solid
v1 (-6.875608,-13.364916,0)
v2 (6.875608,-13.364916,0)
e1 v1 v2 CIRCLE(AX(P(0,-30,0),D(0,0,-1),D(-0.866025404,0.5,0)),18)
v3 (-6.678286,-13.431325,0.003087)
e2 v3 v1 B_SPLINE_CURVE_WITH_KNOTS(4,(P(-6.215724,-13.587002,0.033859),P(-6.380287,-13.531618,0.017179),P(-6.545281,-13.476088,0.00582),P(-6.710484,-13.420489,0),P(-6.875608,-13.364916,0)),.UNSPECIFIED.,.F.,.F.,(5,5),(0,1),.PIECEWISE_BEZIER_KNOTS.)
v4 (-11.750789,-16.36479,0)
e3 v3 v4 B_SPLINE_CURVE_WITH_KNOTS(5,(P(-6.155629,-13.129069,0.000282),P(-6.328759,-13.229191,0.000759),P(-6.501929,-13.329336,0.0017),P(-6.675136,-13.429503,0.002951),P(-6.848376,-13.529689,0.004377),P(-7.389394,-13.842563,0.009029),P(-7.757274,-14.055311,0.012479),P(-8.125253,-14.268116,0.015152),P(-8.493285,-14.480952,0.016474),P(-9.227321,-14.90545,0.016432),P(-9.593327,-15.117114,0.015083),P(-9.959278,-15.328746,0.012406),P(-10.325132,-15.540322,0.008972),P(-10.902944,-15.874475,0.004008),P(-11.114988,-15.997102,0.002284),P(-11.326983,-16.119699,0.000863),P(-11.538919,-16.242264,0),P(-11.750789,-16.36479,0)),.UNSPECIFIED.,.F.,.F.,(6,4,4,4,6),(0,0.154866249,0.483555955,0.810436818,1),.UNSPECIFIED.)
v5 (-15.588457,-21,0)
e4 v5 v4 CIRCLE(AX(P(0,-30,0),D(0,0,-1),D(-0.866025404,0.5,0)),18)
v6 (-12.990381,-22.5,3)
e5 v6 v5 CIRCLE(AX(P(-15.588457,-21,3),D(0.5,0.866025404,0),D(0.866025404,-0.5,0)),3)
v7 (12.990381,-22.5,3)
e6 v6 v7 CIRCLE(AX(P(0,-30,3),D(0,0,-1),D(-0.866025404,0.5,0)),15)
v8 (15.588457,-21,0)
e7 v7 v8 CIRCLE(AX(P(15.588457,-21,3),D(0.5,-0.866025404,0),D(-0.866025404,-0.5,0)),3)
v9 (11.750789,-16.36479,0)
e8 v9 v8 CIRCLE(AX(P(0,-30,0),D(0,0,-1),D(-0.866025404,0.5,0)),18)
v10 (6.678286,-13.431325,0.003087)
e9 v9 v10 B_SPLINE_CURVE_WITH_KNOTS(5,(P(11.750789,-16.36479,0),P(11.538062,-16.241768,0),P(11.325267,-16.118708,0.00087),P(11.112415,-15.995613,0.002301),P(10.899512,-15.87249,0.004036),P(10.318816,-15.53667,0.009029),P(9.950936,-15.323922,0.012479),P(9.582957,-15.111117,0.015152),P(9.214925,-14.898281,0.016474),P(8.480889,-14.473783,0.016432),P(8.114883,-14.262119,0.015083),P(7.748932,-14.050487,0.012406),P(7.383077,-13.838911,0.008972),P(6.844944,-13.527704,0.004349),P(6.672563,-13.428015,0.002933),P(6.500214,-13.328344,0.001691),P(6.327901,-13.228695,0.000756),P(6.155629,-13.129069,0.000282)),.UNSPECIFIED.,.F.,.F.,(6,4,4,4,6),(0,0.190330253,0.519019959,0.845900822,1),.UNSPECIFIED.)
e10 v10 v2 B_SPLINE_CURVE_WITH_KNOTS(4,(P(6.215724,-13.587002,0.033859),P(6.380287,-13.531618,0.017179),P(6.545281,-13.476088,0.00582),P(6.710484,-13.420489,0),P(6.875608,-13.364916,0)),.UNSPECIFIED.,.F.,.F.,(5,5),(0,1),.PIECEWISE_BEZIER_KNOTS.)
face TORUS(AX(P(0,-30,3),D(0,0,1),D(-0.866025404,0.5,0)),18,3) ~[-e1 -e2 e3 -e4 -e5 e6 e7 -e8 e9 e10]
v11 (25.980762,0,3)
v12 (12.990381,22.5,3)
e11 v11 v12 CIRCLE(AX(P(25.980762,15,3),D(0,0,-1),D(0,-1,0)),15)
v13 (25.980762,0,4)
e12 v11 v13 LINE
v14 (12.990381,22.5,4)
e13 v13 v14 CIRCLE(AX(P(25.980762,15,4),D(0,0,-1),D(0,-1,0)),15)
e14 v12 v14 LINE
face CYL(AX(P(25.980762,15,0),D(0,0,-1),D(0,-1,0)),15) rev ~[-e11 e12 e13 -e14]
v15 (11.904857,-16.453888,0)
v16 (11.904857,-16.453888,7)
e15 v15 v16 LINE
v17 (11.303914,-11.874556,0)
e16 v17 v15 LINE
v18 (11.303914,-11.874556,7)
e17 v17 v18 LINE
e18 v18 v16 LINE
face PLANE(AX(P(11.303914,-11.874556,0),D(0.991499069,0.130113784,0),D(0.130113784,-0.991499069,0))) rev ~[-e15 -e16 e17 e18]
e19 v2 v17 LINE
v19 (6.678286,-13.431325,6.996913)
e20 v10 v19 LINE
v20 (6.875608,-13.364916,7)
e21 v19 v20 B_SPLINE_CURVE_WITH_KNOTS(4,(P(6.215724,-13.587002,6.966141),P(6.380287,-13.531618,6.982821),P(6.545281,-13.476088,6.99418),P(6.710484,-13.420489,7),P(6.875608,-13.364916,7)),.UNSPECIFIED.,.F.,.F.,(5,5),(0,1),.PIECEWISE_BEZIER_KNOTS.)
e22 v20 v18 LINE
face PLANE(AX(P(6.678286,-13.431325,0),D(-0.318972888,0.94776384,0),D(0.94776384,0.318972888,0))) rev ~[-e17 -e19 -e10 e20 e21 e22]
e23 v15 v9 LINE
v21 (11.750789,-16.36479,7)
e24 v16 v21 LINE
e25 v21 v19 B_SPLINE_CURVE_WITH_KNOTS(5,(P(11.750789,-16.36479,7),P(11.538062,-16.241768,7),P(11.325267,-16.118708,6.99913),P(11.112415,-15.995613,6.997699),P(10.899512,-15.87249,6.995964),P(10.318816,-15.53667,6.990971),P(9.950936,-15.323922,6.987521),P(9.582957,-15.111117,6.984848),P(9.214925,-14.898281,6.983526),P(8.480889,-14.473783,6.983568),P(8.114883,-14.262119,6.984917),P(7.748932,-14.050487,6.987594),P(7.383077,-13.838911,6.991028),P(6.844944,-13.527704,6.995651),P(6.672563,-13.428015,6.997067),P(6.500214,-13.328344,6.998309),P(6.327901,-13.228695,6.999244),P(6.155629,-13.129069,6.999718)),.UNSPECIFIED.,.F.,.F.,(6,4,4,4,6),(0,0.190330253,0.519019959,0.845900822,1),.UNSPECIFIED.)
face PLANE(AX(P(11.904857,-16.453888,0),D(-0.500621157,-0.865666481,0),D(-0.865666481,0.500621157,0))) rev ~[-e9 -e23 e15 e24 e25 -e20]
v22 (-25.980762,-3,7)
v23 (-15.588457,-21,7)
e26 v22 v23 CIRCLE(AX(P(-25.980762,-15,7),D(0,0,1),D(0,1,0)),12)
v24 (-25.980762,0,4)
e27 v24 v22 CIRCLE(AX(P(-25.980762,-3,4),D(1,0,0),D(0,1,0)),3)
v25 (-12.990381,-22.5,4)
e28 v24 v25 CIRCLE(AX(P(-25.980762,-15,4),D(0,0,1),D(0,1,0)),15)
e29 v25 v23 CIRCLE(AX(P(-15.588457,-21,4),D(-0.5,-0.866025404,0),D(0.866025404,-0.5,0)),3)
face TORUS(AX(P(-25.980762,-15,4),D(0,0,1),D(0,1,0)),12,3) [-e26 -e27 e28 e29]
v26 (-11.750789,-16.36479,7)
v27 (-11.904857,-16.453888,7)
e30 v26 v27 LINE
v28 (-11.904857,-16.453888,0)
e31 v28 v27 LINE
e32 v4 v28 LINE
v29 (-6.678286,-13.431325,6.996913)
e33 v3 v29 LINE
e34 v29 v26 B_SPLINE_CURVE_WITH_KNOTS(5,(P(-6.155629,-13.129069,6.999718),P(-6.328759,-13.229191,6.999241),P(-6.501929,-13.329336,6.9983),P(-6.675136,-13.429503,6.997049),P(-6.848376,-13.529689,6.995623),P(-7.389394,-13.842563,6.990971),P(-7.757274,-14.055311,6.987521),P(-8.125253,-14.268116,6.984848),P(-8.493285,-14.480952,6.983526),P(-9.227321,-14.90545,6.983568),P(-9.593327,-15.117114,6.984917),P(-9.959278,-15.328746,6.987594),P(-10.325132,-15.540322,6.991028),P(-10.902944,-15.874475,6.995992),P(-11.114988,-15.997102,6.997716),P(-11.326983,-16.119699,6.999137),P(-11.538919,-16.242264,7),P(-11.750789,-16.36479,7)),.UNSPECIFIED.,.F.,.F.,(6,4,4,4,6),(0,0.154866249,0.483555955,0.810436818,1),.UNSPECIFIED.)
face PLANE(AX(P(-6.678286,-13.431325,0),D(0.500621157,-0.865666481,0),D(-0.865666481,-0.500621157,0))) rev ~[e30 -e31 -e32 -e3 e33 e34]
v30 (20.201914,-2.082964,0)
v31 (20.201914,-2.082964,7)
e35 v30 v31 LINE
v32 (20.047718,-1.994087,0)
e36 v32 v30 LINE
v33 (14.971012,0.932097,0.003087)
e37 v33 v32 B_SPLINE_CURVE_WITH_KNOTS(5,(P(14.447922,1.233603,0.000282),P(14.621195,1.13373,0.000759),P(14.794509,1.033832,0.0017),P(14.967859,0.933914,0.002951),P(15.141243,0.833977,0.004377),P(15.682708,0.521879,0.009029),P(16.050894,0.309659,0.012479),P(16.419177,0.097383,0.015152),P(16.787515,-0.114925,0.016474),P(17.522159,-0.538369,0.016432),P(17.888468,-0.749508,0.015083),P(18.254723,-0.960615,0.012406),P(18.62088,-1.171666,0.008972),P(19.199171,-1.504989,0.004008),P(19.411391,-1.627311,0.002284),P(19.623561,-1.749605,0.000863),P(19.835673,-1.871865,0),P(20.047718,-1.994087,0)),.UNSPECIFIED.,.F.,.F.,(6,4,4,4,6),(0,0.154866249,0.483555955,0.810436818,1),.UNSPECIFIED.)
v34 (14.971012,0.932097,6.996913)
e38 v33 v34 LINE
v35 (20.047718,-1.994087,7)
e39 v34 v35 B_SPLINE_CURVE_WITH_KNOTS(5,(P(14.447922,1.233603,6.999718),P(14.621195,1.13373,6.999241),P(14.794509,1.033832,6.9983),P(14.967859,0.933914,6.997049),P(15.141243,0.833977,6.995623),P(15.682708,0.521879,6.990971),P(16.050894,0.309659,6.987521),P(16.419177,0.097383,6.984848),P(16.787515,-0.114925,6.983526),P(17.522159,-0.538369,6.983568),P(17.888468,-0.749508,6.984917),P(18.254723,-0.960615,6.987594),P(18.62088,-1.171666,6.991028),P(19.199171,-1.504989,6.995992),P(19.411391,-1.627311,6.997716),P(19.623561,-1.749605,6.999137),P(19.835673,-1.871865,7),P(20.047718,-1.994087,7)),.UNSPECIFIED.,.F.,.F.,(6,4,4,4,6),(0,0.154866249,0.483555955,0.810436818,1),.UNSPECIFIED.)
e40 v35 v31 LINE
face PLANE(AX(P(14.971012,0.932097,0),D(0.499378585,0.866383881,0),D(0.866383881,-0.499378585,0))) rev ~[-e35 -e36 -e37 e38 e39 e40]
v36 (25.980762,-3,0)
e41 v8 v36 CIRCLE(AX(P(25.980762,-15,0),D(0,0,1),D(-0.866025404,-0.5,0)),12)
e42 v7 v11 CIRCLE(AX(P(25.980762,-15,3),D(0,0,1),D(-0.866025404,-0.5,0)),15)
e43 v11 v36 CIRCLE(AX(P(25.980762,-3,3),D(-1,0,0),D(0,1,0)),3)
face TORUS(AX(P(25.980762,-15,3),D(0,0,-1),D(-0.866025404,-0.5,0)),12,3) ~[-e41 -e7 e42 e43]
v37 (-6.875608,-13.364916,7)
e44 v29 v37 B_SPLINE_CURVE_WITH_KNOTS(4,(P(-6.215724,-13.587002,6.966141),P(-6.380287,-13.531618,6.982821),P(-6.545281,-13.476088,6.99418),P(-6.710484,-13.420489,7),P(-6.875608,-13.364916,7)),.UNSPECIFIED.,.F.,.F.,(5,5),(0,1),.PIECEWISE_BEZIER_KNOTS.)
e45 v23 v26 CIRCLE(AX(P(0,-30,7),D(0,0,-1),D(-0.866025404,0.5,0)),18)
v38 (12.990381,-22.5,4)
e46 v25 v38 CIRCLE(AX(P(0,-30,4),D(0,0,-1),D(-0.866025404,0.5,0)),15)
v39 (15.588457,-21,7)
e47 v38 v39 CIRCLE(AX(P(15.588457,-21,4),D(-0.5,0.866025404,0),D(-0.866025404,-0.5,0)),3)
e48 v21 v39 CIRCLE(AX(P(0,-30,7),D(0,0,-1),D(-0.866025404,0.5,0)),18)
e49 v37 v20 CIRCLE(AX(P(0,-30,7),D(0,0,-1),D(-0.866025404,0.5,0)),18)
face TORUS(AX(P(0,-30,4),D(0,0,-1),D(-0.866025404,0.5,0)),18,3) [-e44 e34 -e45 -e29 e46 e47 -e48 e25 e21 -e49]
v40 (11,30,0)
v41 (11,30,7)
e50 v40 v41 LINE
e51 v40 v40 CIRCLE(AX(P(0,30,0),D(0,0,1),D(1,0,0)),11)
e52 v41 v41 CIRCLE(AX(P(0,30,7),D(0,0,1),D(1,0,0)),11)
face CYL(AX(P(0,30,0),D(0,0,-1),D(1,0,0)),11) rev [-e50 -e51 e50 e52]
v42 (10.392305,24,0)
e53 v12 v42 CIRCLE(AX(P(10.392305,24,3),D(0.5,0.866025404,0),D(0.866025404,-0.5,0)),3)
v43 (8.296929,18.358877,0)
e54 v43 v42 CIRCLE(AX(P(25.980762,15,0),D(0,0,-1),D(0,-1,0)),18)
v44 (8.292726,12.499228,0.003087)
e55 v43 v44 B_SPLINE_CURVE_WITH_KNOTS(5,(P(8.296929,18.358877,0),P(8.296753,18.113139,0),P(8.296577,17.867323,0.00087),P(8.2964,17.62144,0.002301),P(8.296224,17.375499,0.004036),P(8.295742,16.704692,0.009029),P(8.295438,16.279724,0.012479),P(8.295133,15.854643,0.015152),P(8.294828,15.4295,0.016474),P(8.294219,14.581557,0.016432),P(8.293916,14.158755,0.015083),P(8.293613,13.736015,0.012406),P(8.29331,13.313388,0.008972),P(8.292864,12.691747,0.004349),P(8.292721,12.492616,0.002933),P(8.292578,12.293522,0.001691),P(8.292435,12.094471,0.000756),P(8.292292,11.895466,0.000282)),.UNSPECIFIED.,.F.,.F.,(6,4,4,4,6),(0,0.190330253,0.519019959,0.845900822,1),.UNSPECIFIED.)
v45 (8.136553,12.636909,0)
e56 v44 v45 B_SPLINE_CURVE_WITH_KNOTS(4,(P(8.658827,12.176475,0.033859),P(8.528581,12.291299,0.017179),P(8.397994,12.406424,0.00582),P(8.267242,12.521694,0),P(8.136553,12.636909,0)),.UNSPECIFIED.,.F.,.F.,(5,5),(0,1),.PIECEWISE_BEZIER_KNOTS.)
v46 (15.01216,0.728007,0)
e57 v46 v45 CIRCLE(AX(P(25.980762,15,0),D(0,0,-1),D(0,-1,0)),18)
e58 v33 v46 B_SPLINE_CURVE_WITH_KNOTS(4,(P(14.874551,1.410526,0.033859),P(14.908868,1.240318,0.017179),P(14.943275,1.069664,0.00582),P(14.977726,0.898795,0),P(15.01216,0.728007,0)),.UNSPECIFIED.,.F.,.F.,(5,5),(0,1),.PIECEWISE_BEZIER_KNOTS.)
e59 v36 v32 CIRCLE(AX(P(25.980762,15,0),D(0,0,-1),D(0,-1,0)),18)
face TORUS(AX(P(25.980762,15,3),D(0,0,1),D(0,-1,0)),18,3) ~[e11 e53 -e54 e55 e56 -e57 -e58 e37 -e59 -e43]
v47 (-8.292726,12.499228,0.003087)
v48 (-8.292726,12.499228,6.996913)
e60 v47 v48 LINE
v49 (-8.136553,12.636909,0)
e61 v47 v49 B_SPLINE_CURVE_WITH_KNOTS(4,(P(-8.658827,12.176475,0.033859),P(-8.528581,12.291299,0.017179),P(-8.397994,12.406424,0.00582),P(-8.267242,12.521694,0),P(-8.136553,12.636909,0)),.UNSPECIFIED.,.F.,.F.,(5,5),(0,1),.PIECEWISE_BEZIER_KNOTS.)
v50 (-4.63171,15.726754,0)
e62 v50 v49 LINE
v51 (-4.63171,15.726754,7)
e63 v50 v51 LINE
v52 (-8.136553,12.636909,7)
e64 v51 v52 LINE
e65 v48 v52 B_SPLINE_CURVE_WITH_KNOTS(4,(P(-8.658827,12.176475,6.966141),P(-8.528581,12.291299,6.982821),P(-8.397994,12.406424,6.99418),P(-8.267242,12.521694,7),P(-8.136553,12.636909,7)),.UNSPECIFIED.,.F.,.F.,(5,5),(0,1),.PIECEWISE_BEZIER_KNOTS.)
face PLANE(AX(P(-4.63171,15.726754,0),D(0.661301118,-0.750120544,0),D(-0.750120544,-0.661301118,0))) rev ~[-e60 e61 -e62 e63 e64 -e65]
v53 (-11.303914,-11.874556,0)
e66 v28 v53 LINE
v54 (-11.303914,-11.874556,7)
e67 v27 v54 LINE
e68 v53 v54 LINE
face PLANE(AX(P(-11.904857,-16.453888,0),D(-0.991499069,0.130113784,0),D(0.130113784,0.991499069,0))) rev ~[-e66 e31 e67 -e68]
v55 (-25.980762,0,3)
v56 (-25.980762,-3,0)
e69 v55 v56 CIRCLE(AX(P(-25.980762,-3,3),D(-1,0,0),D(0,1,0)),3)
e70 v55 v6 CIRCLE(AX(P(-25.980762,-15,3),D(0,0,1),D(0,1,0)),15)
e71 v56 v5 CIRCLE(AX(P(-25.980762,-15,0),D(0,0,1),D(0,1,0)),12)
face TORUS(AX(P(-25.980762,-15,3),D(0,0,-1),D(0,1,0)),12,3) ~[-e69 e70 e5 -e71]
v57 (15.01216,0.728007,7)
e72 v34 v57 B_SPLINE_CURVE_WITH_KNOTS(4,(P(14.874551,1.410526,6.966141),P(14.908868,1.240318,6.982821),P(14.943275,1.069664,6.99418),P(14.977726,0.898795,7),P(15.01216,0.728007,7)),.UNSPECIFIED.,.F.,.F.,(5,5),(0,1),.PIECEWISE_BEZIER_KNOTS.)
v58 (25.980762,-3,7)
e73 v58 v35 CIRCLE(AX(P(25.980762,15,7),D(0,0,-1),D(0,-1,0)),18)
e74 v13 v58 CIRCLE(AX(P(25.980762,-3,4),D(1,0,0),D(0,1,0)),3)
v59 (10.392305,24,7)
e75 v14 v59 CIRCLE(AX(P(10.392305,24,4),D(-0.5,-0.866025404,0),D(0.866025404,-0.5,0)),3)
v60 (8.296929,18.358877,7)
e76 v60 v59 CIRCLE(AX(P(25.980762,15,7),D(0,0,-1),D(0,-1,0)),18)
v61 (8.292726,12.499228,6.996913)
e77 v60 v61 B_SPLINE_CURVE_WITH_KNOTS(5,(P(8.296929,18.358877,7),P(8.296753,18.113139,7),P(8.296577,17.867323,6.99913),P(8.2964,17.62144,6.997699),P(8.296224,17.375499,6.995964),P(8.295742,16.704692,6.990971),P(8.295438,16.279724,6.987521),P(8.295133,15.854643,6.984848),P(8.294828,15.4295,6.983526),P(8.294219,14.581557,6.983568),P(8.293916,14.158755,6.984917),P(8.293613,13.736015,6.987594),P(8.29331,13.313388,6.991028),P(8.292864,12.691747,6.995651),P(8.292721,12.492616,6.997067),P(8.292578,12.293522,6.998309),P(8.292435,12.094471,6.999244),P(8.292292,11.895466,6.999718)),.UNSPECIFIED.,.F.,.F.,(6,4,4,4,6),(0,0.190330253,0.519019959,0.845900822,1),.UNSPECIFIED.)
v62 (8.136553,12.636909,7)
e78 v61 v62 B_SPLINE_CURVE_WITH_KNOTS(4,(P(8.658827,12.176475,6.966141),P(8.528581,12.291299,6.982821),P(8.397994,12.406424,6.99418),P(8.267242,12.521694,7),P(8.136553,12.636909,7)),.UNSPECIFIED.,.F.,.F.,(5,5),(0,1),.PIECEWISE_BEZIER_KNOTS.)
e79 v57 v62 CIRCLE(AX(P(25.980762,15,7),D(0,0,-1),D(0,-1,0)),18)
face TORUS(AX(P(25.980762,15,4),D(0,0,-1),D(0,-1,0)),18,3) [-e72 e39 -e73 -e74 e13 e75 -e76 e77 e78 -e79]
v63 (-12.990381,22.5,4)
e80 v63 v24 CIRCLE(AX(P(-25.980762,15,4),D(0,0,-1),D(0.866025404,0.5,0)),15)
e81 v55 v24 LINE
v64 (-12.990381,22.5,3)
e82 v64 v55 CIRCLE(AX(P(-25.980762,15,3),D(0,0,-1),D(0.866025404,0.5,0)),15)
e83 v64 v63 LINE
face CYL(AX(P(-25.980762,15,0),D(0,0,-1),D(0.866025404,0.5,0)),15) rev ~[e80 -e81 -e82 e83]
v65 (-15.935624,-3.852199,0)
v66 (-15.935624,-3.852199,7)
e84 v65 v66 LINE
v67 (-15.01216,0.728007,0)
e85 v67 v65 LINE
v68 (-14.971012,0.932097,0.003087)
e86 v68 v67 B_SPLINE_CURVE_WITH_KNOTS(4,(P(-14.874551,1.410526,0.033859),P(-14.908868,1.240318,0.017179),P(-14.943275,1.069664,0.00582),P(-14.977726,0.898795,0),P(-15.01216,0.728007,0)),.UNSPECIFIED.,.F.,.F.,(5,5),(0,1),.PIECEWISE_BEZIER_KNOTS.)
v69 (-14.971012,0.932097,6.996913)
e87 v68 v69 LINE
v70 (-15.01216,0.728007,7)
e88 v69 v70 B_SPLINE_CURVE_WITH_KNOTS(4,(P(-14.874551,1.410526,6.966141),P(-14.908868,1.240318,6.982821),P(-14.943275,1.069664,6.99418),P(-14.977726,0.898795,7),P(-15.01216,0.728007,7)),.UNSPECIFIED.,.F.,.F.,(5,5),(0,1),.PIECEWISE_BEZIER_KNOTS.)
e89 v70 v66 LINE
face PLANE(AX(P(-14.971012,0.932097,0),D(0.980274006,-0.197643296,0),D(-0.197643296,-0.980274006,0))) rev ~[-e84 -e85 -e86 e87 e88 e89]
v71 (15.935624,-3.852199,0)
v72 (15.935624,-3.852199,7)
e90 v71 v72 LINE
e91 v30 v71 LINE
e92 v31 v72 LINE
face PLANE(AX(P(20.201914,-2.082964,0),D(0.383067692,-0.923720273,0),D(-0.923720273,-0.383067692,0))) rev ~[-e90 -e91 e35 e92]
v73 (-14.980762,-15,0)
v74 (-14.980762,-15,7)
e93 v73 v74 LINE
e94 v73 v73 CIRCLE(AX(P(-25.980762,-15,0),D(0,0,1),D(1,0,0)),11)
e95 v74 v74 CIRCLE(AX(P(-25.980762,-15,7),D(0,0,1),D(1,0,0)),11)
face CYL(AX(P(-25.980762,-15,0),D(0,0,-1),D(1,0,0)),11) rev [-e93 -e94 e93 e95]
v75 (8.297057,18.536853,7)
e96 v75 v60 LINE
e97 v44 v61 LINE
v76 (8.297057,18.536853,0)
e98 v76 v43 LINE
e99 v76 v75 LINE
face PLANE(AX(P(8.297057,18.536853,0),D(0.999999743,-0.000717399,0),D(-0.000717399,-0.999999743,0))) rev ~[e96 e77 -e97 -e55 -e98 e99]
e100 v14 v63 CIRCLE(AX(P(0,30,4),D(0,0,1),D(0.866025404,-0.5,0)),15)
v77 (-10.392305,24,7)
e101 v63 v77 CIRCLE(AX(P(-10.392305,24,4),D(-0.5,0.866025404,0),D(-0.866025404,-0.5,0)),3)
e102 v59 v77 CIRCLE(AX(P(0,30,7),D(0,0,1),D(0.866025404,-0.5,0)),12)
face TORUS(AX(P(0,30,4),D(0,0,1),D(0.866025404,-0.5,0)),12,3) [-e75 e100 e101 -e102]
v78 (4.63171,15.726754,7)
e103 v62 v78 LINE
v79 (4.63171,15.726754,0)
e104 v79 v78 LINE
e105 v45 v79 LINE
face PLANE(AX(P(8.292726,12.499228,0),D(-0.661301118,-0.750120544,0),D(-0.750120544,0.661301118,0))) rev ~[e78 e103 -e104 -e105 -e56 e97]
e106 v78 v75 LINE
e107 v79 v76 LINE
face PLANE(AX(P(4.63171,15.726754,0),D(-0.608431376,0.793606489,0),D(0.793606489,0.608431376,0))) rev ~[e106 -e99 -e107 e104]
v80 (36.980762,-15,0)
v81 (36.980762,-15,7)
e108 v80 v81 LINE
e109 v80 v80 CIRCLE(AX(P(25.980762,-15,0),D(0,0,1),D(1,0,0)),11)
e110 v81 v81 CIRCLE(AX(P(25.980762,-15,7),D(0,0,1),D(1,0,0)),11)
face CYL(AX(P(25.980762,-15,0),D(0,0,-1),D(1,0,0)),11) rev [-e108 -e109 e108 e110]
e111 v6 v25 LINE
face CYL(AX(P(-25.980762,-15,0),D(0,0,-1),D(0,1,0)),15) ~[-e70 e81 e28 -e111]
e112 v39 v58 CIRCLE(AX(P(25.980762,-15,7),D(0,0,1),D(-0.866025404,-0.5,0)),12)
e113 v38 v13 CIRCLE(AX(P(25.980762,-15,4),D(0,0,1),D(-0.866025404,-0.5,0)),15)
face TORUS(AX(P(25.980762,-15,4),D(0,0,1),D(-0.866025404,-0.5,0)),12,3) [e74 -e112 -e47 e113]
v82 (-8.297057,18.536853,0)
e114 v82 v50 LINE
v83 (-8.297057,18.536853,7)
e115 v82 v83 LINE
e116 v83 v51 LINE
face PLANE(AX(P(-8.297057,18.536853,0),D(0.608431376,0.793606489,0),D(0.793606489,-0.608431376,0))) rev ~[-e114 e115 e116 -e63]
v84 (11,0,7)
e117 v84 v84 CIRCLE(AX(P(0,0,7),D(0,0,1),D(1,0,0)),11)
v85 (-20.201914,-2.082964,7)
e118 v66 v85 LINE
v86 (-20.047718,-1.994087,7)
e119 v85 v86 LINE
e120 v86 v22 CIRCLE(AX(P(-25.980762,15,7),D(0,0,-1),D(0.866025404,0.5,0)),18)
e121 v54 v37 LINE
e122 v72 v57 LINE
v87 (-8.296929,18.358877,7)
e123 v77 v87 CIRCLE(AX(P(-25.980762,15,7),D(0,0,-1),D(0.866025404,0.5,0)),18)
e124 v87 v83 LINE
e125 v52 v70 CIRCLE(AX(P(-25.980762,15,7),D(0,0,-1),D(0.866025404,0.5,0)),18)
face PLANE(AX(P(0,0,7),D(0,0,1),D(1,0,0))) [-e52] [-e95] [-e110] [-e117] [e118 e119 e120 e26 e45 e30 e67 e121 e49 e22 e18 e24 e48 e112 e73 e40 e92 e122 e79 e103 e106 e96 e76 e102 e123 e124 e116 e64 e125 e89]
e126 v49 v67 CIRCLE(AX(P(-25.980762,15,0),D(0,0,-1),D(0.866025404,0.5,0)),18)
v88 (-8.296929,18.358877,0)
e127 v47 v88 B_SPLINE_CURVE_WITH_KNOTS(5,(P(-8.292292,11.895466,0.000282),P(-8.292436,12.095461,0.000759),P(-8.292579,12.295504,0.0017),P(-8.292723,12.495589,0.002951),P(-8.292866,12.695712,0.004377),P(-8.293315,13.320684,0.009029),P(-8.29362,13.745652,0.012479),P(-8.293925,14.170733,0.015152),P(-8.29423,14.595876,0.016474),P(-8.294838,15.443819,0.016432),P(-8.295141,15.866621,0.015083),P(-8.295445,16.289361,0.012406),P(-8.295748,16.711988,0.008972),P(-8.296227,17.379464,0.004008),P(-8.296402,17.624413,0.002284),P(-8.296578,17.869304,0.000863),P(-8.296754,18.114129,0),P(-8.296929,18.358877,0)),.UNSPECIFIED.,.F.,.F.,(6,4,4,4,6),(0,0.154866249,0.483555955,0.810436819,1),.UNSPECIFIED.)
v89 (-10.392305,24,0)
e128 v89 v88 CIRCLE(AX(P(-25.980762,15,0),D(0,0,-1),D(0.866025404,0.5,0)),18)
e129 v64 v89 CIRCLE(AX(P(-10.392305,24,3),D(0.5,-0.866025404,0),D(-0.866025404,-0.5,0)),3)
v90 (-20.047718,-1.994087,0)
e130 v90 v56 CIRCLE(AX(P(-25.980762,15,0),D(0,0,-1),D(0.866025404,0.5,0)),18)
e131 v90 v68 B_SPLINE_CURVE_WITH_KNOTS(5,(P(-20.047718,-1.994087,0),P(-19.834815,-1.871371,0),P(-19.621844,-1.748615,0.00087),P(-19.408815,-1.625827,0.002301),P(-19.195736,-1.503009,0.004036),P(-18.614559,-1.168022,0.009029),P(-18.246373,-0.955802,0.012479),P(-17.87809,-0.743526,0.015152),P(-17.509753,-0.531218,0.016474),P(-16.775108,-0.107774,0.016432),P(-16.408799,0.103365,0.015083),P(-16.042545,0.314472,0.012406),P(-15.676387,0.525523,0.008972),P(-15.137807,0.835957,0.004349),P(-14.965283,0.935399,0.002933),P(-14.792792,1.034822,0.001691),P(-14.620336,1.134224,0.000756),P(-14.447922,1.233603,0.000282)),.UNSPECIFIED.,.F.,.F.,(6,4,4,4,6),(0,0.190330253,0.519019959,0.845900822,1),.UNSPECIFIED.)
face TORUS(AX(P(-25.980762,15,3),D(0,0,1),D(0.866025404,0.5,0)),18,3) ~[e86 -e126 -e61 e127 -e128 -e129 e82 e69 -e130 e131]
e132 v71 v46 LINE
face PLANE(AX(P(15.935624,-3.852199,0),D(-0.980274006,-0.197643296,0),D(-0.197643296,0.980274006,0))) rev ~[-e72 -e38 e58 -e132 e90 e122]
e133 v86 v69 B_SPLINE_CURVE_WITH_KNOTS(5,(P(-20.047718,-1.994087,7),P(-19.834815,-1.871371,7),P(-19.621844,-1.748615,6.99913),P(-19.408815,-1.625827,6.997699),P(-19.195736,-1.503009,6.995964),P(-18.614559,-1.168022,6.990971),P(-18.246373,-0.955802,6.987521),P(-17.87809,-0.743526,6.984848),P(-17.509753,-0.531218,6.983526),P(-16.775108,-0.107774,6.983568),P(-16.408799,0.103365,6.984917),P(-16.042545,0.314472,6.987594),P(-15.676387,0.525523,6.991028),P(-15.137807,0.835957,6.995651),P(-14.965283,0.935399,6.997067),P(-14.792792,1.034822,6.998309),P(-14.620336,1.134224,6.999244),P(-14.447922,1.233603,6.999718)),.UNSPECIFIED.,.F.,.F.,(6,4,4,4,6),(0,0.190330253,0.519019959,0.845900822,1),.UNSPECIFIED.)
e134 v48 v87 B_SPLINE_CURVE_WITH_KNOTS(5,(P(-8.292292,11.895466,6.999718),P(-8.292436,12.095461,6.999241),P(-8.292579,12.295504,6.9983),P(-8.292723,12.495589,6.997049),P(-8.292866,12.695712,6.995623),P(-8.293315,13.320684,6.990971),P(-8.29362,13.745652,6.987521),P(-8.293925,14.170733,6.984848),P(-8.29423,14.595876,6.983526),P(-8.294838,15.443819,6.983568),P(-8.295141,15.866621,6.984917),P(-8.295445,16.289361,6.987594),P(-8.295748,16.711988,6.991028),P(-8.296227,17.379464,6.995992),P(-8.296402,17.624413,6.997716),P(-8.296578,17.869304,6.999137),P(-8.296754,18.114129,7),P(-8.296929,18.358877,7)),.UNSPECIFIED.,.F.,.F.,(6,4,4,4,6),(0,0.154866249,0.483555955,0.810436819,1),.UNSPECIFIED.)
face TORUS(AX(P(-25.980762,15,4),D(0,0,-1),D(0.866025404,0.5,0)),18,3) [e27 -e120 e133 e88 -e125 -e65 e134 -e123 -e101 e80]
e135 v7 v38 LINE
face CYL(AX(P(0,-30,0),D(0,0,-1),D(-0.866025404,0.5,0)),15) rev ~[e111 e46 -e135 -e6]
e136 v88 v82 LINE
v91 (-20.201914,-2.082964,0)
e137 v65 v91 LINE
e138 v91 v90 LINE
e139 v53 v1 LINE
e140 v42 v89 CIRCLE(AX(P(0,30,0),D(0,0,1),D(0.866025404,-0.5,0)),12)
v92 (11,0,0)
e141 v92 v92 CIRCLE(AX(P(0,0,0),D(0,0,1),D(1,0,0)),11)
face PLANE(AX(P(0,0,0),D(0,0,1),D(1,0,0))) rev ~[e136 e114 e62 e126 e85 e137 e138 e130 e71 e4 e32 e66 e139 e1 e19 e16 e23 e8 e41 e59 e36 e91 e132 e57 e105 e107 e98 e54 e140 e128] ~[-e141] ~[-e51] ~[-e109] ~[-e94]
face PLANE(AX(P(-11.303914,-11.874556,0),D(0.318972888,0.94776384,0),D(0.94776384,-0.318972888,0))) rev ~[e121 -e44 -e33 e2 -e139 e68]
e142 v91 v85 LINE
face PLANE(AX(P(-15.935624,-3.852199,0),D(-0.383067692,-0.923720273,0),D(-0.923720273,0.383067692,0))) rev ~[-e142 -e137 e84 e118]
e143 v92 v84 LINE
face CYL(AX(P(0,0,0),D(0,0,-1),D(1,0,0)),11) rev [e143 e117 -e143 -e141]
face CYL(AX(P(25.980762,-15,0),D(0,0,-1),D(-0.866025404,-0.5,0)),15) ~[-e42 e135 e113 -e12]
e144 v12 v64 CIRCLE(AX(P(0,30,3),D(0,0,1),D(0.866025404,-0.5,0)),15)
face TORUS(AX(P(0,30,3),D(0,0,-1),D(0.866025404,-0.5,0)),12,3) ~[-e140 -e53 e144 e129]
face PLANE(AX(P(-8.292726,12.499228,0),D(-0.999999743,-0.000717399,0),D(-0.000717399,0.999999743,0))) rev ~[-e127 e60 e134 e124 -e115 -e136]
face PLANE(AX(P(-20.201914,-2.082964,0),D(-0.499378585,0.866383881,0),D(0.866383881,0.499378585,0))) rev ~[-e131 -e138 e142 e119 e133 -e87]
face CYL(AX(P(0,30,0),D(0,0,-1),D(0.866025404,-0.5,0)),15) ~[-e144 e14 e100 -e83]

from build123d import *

# Parameters (mm, degrees)
F0_R         = 11
F1_DEPTH     = 7
F2_T2_ANGLE  = 120
F2_T4_ANGLE  = 240
F2_T6_ANGLE  = 120
F2_T8_ANGLE  = 120
F2_T10_ANGLE = 240
F2_T12_ANGLE = 120
F2_T14_ANGLE = 240
F2_T16_ANGLE = 240
F2_T18_ANGLE = 120
F2_T20_ANGLE = 240
F2_T22_ANGLE = 120
F2_T24_ANGLE = 240


# Not quite as in the source:
# - a fillet or chamfer that OpenCascade refuses, or shapes differently, is made with other operations: its cross-section is extruded or revolved along the edge and cut away or added


with BuildPart() as f1:
    # F0 (on Top) → F1 (new body)
    with BuildSketch(Plane.XY):
        with BuildLine():
            ThreePointArc((25.9807621135, 0), (12.9903810568, 7.5), (12.9903810568, 22.5))
            ThreePointArc((12.9903810568, 22.5), (0, 45), (-12.9903810568, 22.5))
            ThreePointArc((-12.9903810568, 22.5), (-12.9903810568, 7.5), (-25.9807621135, 0))
            ThreePointArc((-25.9807621135, 0), (-38.9711431703, -22.5), (-12.9903810568, -22.5))
            ThreePointArc((-12.9903810568, -22.5), (0, -15), (12.9903810568, -22.5))
            ThreePointArc((12.9903810568, -22.5), (38.9711431703, -22.5), (25.9807621135, 0))
        make_face()
        with Locations((-25.9807621135, -15)):
            Circle(F0_R, mode=Mode.SUBTRACT)
        Polygon((-11.9048568753, -16.4538883806), (-11.3039139792, -11.8745555474), (-6.6782863332, -13.4313250148), align=None, mode=Mode.SUBTRACT)
        Polygon((-14.9710118359, 0.9320968891), (-15.9356237523, -3.8521988945), (-20.2019137663, -2.0829642921), align=None, mode=Mode.SUBTRACT)
        Polygon((6.6782863332, -13.4313250148), (11.3039139792, -11.8745555474), (11.9048568753, -16.4538883806), align=None, mode=Mode.SUBTRACT)
        with Locations((25.9807621135, -15)):
            Circle(F0_R, mode=Mode.SUBTRACT)
        Circle(F0_R, mode=Mode.SUBTRACT)
        Polygon((15.9356237523, -3.8521988945), (14.9710118359, 0.9320968891), (20.2019137663, -2.0829642921), align=None, mode=Mode.SUBTRACT)
        Polygon((-8.2927255027, 12.4992281257), (-8.297056891, 18.5368526727), (-4.6317097731, 15.7267544419), align=None, mode=Mode.SUBTRACT)
        Polygon((4.6317097731, 15.7267544419), (8.297056891, 18.5368526727), (8.2927255027, 12.4992281257), align=None, mode=Mode.SUBTRACT)
        with Locations((0, 30)):
            Circle(F0_R, mode=Mode.SUBTRACT)
    extrude(amount=F1_DEPTH)

    # F2: fillet of radius 3 on 12 edges, made by hand

    # F2_s1 → F2_t2 (revolve, cut)
    with BuildSketch(Plane(origin=(-12.9903810568, 22.5, 0), x_dir=(0, 0, 1), z_dir=(-0.5, 0.8660254038, 0))):
        with BuildLine():
            ThreePointArc((4, 0), (6.1213203436, 0.8786796564), (7, 3))
            Line((7, 3), (7, 0))
            Line((7, 0), (4, 0))
        make_face()
    revolve(axis=Axis((-25.9807621135, 15, 7), (0, 0, -1)), revolution_arc=F2_T2_ANGLE, mode=Mode.SUBTRACT)

    # F2_s3 → F2_t4 (revolve, cut)
    with BuildSketch(Plane(origin=(12.9903810568, 22.5, 0), x_dir=(0, 0, 1), z_dir=(-0.5, -0.8660254038, 0))):
        with BuildLine():
            ThreePointArc((4, 0), (6.1213203436, 0.8786796564), (7, 3))
            Line((7, 3), (7, 0))
            Line((7, 0), (4, 0))
        make_face()
    revolve(axis=Axis((0, 30, 7), (0, 0, 1)), revolution_arc=F2_T4_ANGLE, mode=Mode.SUBTRACT)

    # F2_s5 → F2_t6 (revolve, cut)
    with BuildSketch(Plane.YZ.offset(25.9807621135)):
        with BuildLine():
            ThreePointArc((0, 3), (-0.8786796564, 0.8786796564), (-3, 0))
            Line((-3, 0), (0, 0))
            Line((0, 0), (0, 3))
        make_face()
    revolve(axis=Axis((25.9807621135, 15, 0), (0, 0, -1)), revolution_arc=F2_T6_ANGLE, mode=Mode.SUBTRACT)

    # F2_s7 → F2_t8 (revolve, cut)
    with BuildSketch(Plane.YZ.offset(25.9807621135)):
        with BuildLine():
            ThreePointArc((0, 4), (-0.8786796564, 6.1213203436), (-3, 7))
            Line((-3, 7), (0, 7))
            Line((0, 7), (0, 4))
        make_face()
    revolve(axis=Axis((25.9807621135, 15, 7), (0, 0, -1)), revolution_arc=F2_T8_ANGLE, mode=Mode.SUBTRACT)

    # F2_s9 → F2_t10 (revolve, cut)
    with BuildSketch(Plane(origin=(12.9903810568, -22.5, 0), x_dir=(0, 0, 1), z_dir=(-0.5, 0.8660254038, 0))):
        with BuildLine():
            ThreePointArc((4, 0), (6.1213203436, 0.8786796564), (7, 3))
            Line((7, 3), (7, 0))
            Line((7, 0), (4, 0))
        make_face()
    revolve(axis=Axis((25.9807621135, -15, 7), (0, 0, 1)), revolution_arc=F2_T10_ANGLE, mode=Mode.SUBTRACT)

    # F2_s11 → F2_t12 (revolve, cut)
    with BuildSketch(Plane(origin=(-12.9903810568, -22.5, 0), x_dir=(0, 0, 1), z_dir=(-0.5, -0.8660254038, 0))):
        with BuildLine():
            ThreePointArc((4, 0), (6.1213203436, 0.8786796564), (7, 3))
            Line((7, 3), (7, 0))
            Line((7, 0), (4, 0))
        make_face()
    revolve(axis=Axis((0, -30, 7), (0, 0, -1)), revolution_arc=F2_T12_ANGLE, mode=Mode.SUBTRACT)

    # F2_s13 → F2_t14 (revolve, cut)
    with BuildSketch(Plane.YZ.offset(-25.9807621135)):
        with BuildLine():
            ThreePointArc((0, 4), (-0.8786796564, 6.1213203436), (-3, 7))
            Line((-3, 7), (0, 7))
            Line((0, 7), (0, 4))
        make_face()
    revolve(axis=Axis((-25.9807621135, -15, 7), (0, 0, 1)), revolution_arc=F2_T14_ANGLE, mode=Mode.SUBTRACT)

    # F2_s15 → F2_t16 (revolve, cut)
    with BuildSketch(Plane(origin=(12.9903810568, 22.5, 0), x_dir=(0, 0, 1), z_dir=(-0.5, -0.8660254038, 0))):
        with BuildLine():
            ThreePointArc((3, 0), (0.8786796564, 0.8786796564), (0, 3))
            Line((0, 3), (0, 0))
            Line((0, 0), (3, 0))
        make_face()
    revolve(axis=Axis((0, 30, 0), (0, 0, 1)), revolution_arc=F2_T16_ANGLE, mode=Mode.SUBTRACT)

    # F2_s17 → F2_t18 (revolve, cut)
    with BuildSketch(Plane(origin=(-12.9903810568, 22.5, 0), x_dir=(0, 0, 1), z_dir=(-0.5, 0.8660254038, 0))):
        with BuildLine():
            ThreePointArc((3, 0), (0.8786796564, 0.8786796564), (0, 3))
            Line((0, 3), (0, 0))
            Line((0, 0), (3, 0))
        make_face()
    revolve(axis=Axis((-25.9807621135, 15, 0), (0, 0, -1)), revolution_arc=F2_T18_ANGLE, mode=Mode.SUBTRACT)

    # F2_s19 → F2_t20 (revolve, cut)
    with BuildSketch(Plane.YZ.offset(-25.9807621135)):
        with BuildLine():
            ThreePointArc((0, 3), (-0.8786796564, 0.8786796564), (-3, 0))
            Line((-3, 0), (0, 0))
            Line((0, 0), (0, 3))
        make_face()
    revolve(axis=Axis((-25.9807621135, -15, 0), (0, 0, 1)), revolution_arc=F2_T20_ANGLE, mode=Mode.SUBTRACT)

    # F2_s21 → F2_t22 (revolve, cut)
    with BuildSketch(Plane(origin=(-12.9903810568, -22.5, 0), x_dir=(0, 0, 1), z_dir=(-0.5, -0.8660254038, 0))):
        with BuildLine():
            ThreePointArc((3, 0), (0.8786796564, 0.8786796564), (0, 3))
            Line((0, 3), (0, 0))
            Line((0, 0), (3, 0))
        make_face()
    revolve(axis=Axis((0, -30, 0), (0, 0, -1)), revolution_arc=F2_T22_ANGLE, mode=Mode.SUBTRACT)

    # F2_s23 → F2_t24 (revolve, cut)
    with BuildSketch(Plane(origin=(12.9903810568, -22.5, 0), x_dir=(0, 0, 1), z_dir=(-0.5, 0.8660254038, 0))):
        with BuildLine():
            ThreePointArc((3, 0), (0.8786796564, 0.8786796564), (0, 3))
            Line((0, 3), (0, 0))
            Line((0, 0), (3, 0))
        make_face()
    revolve(axis=Axis((25.9807621135, -15, 0), (0, 0, 1)), revolution_arc=F2_T24_ANGLE, mode=Mode.SUBTRACT)


solid = f1.part
